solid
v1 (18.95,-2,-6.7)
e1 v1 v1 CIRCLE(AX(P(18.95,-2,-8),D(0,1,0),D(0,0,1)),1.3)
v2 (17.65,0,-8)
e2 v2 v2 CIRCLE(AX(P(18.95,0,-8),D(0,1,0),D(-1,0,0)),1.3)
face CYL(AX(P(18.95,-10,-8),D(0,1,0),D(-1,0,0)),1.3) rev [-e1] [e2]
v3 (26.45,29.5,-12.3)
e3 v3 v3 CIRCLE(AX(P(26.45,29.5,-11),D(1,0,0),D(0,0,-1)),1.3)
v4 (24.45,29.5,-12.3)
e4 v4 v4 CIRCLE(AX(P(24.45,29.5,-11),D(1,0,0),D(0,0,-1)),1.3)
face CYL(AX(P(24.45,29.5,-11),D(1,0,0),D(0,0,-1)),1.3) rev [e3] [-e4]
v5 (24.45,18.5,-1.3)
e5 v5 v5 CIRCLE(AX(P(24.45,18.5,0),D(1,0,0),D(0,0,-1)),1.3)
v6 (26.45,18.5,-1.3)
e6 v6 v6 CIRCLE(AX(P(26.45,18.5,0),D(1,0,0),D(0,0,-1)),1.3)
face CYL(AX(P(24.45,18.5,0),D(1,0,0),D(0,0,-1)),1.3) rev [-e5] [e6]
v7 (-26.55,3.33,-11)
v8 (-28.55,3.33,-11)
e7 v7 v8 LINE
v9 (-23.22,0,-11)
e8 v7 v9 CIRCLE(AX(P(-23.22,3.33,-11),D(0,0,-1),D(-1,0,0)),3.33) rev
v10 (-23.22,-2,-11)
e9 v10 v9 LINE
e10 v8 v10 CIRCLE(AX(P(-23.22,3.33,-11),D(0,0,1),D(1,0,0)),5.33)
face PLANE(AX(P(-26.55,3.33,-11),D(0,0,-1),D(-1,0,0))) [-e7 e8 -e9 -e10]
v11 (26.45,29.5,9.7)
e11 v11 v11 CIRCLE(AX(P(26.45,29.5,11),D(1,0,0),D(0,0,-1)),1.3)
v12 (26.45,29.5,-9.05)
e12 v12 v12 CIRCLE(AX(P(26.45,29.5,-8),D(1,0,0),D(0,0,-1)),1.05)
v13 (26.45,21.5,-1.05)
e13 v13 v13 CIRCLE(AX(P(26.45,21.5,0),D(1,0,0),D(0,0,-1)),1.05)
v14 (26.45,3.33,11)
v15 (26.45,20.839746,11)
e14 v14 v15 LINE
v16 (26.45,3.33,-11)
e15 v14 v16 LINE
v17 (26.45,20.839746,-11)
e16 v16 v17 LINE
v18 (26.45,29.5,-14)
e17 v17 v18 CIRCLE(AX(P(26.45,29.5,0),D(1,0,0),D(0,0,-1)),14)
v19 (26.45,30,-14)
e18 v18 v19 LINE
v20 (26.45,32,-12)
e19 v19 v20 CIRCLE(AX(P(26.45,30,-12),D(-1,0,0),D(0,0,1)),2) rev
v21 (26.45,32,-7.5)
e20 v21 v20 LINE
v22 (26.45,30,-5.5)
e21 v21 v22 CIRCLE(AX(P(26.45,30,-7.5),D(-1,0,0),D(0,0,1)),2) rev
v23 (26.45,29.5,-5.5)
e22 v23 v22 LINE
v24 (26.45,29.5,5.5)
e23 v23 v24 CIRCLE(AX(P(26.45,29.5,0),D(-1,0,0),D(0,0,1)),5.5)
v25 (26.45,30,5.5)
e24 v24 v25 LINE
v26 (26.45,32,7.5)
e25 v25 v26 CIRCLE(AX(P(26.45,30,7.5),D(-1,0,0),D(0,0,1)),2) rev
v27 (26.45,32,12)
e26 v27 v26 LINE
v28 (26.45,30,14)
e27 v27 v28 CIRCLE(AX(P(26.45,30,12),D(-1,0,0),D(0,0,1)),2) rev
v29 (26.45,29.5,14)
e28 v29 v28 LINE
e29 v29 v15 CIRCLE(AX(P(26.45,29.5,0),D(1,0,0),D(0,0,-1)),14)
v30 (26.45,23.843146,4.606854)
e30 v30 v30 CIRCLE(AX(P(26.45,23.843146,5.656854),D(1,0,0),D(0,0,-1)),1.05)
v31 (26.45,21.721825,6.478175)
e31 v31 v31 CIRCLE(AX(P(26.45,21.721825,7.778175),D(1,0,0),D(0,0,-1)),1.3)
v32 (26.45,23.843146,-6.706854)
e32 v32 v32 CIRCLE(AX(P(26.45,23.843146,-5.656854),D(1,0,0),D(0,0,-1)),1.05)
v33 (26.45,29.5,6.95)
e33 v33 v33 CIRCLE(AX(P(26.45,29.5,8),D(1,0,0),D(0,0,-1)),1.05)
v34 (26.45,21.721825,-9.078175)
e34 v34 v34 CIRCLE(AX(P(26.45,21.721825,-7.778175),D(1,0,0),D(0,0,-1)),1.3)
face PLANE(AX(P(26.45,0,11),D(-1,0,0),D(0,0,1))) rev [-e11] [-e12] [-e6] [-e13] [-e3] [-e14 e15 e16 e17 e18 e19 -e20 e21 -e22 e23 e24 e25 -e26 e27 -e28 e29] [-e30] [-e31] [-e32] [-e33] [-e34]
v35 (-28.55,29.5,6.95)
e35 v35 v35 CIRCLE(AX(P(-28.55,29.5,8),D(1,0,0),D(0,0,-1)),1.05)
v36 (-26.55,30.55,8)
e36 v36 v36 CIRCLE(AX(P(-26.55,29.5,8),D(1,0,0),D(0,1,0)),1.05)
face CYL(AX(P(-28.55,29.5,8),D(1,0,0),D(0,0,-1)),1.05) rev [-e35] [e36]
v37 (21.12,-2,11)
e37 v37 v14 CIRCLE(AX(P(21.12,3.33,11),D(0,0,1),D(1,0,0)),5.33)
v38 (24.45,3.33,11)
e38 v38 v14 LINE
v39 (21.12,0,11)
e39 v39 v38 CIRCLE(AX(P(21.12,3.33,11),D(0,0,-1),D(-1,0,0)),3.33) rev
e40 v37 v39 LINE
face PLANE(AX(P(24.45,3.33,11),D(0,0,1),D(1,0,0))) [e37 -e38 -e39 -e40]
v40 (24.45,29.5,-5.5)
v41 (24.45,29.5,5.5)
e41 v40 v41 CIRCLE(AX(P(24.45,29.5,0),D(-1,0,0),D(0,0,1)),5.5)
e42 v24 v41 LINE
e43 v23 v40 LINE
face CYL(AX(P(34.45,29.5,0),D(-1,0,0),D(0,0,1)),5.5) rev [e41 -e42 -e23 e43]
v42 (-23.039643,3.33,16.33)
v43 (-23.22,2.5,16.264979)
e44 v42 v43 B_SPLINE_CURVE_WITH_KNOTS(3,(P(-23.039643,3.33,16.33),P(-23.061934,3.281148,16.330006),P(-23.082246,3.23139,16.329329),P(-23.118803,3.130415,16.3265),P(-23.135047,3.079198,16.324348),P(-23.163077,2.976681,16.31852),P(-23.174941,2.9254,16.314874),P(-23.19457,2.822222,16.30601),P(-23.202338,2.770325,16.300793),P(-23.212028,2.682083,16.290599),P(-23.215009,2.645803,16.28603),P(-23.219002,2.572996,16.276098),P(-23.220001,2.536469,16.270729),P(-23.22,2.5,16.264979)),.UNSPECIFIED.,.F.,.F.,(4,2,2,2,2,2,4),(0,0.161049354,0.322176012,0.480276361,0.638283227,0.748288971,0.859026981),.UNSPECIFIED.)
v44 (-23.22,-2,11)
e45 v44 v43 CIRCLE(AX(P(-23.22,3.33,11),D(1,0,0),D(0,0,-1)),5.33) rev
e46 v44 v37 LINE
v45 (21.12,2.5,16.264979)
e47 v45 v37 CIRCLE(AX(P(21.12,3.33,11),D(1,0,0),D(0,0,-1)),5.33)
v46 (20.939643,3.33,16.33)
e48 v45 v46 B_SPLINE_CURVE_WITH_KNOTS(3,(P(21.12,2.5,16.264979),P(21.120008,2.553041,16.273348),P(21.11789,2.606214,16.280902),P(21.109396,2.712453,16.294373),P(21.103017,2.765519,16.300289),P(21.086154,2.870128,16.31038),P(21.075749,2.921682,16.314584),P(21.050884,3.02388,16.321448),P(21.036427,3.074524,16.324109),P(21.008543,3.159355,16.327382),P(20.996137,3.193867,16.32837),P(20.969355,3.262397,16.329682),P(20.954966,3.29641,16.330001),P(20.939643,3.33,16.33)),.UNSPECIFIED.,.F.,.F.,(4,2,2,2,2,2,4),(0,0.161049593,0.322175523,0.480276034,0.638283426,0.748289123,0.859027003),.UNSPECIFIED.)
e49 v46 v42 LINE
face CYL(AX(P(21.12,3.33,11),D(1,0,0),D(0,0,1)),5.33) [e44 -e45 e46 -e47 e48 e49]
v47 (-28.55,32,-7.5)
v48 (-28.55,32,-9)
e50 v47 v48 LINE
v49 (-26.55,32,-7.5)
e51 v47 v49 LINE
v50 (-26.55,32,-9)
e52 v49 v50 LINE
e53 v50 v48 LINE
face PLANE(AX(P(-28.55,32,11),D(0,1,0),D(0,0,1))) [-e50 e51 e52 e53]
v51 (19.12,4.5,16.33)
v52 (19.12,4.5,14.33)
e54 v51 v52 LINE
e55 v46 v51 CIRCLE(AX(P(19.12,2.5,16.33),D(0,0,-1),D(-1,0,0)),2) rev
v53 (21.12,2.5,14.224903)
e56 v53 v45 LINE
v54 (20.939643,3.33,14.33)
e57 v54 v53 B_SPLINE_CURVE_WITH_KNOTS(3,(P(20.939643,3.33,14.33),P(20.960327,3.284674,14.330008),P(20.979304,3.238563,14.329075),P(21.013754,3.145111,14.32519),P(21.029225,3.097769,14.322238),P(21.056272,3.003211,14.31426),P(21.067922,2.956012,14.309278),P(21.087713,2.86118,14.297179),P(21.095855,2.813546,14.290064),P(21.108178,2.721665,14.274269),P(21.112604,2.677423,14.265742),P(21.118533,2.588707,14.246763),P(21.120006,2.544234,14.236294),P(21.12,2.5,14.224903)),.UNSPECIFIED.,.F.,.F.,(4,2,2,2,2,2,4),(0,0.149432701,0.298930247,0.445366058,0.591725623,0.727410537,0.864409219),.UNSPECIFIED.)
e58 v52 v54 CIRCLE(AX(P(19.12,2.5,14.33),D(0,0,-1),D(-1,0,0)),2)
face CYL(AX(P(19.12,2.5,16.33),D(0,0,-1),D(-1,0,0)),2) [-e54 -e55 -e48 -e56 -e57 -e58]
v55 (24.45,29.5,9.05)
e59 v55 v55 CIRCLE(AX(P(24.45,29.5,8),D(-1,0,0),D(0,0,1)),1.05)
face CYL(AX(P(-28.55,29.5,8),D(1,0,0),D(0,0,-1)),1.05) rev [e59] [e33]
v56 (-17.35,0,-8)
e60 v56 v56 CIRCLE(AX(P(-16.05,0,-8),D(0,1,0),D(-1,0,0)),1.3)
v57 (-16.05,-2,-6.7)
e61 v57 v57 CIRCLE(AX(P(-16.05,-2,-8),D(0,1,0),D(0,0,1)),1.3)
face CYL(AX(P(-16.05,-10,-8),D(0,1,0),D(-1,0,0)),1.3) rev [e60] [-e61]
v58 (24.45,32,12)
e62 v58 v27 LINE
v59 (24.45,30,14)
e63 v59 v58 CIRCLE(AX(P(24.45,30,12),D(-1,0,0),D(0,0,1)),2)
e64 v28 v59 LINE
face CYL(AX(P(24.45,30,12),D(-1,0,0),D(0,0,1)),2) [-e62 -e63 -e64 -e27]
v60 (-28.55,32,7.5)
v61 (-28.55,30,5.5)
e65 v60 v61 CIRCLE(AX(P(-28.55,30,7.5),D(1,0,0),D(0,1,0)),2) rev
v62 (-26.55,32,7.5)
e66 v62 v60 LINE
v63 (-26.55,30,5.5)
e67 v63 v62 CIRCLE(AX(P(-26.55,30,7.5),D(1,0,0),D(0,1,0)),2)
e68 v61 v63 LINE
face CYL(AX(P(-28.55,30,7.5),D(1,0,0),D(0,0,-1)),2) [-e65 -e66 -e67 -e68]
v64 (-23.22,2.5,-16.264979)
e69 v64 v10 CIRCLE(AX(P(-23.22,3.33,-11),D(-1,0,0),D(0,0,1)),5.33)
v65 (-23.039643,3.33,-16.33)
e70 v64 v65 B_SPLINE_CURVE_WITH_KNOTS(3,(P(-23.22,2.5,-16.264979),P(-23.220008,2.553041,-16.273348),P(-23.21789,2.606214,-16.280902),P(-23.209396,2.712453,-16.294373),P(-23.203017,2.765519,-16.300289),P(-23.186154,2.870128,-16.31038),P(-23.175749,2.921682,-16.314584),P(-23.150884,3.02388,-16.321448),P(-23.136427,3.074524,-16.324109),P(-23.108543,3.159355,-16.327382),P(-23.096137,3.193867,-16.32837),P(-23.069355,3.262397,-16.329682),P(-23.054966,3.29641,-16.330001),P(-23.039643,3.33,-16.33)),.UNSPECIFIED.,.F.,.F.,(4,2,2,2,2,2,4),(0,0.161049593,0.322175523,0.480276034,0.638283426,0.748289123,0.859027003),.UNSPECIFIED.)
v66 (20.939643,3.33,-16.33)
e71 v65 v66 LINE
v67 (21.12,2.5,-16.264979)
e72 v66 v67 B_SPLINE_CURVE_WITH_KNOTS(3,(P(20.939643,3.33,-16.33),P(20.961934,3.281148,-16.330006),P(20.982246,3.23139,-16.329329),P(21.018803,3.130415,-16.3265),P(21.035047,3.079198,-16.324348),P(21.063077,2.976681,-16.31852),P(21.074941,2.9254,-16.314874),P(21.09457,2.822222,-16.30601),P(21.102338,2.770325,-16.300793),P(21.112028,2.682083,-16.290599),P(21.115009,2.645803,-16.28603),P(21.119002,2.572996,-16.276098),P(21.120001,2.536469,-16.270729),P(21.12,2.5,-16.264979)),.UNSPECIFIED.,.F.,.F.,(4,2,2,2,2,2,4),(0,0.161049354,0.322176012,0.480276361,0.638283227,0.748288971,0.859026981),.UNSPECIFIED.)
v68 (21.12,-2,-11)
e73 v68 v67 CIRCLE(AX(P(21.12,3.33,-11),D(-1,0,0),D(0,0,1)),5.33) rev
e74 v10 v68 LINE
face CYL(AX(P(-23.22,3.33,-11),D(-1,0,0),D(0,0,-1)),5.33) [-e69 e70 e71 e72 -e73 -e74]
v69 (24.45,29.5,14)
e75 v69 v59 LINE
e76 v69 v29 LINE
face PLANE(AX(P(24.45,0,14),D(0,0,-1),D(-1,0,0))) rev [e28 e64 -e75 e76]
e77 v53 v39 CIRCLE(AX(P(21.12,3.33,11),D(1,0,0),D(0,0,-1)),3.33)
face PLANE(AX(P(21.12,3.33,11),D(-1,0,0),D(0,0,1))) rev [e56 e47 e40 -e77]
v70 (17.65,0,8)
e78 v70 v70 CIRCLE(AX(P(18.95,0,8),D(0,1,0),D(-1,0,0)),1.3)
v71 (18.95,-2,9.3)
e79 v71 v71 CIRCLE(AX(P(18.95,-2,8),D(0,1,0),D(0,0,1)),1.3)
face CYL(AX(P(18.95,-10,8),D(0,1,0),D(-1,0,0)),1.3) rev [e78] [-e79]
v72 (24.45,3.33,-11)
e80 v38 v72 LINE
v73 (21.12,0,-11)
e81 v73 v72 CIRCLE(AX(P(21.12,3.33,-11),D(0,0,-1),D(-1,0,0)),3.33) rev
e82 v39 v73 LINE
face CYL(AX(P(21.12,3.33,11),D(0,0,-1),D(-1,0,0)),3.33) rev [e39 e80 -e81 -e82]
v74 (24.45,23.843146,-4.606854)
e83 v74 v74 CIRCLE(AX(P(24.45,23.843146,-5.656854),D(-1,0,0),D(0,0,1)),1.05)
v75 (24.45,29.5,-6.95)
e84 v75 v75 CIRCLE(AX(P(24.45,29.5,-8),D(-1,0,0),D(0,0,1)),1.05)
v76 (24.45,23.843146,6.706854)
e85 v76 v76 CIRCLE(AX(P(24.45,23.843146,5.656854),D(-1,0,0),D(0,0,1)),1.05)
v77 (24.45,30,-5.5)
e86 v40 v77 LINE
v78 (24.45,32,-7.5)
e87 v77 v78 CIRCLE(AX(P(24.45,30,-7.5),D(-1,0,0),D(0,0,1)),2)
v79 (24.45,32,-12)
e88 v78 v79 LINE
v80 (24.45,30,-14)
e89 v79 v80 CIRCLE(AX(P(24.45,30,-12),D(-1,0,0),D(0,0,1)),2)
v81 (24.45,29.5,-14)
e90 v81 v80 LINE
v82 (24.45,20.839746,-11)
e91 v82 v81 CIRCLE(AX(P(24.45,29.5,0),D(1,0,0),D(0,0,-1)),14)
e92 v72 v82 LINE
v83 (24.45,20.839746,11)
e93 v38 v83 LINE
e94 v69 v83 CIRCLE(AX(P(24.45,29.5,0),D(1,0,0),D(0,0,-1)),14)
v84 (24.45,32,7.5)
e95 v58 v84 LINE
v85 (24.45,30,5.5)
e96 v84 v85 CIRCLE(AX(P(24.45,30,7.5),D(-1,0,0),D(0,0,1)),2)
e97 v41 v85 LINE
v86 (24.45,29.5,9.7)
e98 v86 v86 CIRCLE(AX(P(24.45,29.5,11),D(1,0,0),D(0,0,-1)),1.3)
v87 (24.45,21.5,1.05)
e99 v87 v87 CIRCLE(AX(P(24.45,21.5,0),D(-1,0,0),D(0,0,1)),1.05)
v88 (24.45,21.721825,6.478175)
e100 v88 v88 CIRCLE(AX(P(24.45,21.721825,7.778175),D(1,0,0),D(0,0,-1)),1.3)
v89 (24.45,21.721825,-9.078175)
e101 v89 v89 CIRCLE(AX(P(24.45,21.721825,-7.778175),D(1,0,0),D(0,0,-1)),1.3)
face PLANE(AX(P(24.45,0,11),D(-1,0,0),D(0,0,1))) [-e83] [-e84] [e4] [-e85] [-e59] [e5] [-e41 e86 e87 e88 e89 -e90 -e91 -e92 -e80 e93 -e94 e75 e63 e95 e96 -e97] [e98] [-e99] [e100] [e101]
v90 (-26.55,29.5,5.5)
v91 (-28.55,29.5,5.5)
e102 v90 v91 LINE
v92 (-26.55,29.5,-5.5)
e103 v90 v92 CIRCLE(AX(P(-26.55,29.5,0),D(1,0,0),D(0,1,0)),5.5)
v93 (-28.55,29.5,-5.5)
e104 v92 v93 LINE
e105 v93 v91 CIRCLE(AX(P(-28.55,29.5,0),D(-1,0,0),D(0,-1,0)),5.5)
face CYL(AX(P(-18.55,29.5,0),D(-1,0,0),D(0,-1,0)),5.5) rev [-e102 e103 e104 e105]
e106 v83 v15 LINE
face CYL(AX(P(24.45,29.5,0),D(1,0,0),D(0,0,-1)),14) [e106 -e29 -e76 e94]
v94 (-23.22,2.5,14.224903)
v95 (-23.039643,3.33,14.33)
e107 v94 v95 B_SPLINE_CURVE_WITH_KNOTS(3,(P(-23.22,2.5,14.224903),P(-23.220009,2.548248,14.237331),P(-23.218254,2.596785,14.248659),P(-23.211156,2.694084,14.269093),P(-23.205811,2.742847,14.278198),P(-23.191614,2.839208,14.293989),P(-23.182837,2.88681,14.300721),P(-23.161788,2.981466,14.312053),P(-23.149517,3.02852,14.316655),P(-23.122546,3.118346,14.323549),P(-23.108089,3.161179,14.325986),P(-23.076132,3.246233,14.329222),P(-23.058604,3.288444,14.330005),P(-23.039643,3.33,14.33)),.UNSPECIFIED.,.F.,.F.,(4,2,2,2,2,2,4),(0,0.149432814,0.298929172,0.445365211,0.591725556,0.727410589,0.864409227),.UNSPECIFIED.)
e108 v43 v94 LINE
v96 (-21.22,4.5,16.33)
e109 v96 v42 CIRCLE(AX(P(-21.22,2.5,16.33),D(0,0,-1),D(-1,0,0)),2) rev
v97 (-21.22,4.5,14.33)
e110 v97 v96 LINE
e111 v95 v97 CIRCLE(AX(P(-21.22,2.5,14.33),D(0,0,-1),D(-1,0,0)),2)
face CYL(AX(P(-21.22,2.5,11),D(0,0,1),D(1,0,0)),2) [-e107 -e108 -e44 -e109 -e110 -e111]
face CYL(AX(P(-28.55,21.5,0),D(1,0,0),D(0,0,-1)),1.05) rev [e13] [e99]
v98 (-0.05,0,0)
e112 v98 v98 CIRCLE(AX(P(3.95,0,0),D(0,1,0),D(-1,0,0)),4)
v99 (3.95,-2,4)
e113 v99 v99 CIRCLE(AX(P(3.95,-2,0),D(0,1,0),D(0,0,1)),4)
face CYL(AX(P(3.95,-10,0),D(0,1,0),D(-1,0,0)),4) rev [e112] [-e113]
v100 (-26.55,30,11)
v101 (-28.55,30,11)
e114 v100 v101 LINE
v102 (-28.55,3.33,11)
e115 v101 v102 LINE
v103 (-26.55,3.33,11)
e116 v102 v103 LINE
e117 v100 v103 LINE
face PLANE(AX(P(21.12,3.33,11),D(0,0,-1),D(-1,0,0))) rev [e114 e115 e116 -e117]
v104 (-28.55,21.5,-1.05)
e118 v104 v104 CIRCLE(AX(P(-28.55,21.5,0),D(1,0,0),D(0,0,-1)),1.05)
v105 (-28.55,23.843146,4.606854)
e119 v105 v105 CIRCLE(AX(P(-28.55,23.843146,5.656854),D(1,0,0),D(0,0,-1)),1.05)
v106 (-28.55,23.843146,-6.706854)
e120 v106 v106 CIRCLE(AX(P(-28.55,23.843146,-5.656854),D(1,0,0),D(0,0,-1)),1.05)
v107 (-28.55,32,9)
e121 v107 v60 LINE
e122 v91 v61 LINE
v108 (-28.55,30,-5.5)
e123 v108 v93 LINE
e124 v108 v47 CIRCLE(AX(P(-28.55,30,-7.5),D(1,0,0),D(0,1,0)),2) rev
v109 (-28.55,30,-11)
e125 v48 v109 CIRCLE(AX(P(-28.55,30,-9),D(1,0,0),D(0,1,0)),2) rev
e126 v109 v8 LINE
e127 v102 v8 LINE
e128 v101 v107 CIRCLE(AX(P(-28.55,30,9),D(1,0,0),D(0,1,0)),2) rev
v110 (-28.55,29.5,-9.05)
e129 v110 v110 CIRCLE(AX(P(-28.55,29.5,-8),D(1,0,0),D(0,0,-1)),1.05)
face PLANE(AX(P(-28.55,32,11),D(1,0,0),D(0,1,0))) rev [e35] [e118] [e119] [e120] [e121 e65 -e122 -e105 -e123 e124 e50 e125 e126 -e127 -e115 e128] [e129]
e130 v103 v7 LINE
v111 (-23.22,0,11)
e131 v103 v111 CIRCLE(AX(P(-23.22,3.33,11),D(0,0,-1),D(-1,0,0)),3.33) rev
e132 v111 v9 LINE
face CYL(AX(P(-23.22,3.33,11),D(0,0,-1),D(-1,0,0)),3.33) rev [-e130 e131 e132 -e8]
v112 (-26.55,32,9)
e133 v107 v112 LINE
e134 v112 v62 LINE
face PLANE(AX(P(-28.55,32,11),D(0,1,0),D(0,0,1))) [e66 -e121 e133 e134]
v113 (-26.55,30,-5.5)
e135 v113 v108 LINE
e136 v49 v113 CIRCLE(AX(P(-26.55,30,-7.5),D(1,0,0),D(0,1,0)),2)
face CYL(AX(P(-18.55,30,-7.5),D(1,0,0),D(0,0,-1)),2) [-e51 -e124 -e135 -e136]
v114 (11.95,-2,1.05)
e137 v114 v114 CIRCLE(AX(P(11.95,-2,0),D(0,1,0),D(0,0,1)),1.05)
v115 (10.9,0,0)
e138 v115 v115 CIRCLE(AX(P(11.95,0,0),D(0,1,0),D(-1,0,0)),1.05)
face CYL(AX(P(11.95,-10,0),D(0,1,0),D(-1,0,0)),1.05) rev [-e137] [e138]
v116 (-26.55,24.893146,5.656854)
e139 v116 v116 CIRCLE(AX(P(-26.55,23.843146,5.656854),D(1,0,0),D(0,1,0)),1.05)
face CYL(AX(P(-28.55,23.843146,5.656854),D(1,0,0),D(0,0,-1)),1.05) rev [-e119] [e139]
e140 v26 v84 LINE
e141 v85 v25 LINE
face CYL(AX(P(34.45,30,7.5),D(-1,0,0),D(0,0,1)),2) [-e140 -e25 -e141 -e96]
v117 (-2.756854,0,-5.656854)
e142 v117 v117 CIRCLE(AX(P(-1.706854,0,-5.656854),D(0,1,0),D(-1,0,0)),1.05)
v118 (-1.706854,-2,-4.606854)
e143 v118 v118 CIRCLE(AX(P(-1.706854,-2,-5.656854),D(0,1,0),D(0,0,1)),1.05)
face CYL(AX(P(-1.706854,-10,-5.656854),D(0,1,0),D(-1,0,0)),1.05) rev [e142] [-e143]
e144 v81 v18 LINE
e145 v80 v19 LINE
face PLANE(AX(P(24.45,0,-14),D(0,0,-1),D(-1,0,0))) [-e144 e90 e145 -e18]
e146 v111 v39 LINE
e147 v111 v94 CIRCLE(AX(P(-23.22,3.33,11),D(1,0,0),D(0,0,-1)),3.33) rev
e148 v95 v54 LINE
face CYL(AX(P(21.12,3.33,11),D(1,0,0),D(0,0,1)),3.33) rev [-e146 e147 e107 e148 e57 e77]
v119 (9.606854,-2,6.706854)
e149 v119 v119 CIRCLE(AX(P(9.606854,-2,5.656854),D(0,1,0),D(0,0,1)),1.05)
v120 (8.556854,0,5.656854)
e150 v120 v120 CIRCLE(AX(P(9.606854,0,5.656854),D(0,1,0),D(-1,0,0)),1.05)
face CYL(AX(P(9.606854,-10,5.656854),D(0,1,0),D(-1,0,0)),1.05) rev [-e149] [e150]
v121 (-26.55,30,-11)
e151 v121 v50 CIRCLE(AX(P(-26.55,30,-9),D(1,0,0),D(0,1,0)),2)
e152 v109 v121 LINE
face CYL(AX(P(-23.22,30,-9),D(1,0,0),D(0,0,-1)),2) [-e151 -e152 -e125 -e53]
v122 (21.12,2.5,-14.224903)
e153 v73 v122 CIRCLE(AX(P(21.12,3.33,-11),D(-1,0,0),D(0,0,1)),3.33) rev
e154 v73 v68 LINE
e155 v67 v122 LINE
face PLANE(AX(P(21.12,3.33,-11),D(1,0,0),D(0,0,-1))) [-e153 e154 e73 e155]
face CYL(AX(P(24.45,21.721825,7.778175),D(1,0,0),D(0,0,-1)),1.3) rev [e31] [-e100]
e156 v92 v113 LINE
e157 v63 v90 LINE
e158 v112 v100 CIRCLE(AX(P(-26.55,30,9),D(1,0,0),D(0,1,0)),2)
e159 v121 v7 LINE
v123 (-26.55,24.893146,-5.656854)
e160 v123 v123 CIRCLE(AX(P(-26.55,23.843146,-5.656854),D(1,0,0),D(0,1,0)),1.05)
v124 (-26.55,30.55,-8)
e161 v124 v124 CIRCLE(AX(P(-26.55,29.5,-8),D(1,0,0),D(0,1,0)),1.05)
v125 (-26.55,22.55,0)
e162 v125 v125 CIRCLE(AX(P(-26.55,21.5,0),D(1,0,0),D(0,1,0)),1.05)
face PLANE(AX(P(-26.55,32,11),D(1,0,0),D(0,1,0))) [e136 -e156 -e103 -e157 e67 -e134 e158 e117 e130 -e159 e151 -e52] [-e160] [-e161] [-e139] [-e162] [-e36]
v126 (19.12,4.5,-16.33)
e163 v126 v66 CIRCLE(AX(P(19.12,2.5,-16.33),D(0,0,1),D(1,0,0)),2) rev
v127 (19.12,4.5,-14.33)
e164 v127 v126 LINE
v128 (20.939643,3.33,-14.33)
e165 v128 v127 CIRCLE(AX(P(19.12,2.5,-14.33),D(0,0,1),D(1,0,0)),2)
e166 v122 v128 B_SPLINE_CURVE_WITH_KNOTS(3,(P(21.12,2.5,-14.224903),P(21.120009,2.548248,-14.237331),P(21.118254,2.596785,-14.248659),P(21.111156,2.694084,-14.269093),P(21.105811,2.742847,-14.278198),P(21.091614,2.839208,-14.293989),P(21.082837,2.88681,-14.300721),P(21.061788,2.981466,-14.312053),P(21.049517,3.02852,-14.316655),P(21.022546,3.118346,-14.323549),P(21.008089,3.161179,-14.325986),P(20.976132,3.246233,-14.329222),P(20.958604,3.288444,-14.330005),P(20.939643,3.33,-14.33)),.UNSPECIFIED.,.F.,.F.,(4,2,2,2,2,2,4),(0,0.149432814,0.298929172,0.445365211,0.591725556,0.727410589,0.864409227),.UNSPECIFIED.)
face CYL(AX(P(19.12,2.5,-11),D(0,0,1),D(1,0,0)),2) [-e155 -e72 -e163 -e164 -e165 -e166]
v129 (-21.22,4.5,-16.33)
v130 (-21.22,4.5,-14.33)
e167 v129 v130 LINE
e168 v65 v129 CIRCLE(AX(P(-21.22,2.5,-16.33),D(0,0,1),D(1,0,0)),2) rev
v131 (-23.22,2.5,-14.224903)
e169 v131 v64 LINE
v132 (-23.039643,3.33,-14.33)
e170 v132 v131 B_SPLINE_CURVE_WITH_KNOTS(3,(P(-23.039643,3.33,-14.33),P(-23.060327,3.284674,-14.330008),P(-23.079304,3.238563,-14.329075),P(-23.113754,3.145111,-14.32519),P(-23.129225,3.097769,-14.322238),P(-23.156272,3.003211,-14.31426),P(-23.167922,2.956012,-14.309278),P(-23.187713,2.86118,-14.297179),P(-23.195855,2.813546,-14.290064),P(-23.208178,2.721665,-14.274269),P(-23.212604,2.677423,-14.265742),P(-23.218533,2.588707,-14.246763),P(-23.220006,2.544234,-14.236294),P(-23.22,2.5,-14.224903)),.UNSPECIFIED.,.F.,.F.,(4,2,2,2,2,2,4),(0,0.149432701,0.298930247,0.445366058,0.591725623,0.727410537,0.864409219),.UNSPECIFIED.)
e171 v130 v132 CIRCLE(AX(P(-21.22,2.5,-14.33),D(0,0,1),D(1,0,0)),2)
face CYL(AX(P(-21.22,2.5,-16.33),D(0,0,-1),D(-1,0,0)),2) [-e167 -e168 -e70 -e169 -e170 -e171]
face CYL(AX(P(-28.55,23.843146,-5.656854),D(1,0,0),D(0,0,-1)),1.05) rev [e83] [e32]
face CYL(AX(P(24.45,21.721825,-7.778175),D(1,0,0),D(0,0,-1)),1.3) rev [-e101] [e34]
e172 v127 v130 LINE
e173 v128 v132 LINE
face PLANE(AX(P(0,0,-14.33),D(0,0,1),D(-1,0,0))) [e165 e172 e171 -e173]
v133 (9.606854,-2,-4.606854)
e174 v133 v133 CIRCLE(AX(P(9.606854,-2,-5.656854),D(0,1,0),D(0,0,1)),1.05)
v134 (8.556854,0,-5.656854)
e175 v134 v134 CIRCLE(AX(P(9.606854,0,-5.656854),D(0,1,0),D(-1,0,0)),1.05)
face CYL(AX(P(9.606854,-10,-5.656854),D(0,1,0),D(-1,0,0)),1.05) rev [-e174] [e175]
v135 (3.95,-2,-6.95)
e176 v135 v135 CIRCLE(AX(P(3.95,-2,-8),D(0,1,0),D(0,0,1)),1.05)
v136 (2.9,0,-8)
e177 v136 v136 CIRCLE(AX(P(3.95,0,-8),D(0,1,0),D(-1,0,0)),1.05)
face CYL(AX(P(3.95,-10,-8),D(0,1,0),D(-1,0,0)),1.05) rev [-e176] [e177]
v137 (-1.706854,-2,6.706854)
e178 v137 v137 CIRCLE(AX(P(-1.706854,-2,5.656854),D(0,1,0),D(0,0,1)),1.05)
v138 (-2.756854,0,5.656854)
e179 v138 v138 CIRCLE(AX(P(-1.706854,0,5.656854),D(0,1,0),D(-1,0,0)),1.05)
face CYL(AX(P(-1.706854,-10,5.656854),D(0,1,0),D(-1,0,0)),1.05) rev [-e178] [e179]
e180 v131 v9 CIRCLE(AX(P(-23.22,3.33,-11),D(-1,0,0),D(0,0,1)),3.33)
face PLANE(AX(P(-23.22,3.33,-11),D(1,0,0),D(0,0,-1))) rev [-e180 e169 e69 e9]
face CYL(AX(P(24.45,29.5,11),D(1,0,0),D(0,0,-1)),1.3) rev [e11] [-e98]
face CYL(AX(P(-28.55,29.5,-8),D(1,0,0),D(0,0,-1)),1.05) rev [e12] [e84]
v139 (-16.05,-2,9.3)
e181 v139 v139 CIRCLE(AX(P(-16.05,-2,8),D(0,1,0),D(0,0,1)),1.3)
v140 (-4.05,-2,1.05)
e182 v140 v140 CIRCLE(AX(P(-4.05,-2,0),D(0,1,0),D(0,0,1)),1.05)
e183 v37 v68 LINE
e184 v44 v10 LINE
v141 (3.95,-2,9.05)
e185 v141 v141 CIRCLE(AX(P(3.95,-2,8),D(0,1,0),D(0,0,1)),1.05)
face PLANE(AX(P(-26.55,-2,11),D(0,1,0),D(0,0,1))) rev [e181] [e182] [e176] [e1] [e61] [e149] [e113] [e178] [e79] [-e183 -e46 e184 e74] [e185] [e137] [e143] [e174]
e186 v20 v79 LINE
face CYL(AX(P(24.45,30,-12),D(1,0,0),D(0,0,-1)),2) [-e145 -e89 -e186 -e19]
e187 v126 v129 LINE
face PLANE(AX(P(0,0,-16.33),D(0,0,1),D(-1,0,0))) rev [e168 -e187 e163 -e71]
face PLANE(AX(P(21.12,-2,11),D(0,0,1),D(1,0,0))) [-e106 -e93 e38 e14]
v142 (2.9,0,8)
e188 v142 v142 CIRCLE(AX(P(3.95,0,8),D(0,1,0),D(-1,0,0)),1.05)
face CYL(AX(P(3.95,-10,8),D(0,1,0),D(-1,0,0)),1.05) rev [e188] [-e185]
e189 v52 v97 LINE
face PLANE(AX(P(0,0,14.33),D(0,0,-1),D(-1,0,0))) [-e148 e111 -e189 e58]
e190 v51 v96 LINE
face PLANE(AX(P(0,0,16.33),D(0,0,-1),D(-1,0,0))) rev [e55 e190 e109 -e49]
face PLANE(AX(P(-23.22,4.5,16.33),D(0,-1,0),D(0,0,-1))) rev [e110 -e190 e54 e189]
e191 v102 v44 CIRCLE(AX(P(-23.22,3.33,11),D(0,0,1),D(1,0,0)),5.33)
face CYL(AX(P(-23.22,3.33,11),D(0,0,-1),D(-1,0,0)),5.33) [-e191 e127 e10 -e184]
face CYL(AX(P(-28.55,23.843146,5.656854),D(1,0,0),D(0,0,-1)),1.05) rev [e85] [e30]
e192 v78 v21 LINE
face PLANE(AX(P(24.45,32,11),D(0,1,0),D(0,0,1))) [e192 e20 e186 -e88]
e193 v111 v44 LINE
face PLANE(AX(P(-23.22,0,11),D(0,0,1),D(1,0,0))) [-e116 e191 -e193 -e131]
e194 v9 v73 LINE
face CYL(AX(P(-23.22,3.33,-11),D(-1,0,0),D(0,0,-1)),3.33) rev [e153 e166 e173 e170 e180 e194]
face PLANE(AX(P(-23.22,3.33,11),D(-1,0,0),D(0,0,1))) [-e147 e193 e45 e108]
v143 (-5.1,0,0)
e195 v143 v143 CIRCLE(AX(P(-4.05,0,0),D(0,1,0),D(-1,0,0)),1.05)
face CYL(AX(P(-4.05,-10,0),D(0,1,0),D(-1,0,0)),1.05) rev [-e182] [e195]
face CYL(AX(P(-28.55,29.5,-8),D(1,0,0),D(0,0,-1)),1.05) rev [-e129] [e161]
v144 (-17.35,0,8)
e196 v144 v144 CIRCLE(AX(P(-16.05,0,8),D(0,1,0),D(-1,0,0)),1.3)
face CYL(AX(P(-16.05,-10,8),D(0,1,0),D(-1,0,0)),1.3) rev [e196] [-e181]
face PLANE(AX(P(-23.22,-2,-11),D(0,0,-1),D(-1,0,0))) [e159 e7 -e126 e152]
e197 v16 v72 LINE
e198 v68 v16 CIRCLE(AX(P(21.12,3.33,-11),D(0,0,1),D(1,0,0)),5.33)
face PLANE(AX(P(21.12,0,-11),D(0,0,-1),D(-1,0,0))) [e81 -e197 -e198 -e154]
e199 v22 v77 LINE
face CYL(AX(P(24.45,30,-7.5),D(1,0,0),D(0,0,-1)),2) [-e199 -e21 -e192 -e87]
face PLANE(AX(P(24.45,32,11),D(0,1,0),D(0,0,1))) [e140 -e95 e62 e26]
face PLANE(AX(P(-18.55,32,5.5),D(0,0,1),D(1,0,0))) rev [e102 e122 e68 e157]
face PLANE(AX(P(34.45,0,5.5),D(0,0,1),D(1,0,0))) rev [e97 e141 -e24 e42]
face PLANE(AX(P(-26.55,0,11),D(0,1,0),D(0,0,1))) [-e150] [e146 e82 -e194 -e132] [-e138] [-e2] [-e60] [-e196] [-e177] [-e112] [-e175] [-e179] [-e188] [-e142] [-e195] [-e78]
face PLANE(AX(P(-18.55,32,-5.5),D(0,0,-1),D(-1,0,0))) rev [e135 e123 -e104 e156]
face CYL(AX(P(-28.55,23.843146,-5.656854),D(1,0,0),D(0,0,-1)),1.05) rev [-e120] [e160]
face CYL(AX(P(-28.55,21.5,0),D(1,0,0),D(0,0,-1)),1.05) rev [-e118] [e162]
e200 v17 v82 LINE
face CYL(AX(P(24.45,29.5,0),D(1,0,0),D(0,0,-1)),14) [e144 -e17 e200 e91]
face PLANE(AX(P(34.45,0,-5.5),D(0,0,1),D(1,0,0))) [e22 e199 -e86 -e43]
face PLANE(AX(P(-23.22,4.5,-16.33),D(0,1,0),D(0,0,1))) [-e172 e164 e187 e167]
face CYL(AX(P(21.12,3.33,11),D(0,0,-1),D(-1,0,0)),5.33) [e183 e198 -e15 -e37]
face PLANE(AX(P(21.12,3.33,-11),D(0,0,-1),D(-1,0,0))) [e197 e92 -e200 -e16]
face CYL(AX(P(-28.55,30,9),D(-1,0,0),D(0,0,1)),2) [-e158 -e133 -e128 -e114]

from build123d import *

# Parameters (mm, degrees)
BASE_FLANGE1_DEPTH      = 11
SKETCH5_R               = 4
SKETCH5_R_2             = 1.3
SKETCH5_R_3             = 1.05
CUT_EXTRUDE1_DEPTH      = 10
CUT_EXTRUDE2_DEPTH      = 45.273044847
CUT_EXTRUDE2_DEPTH_BACK = 45.273044847
SKETCH6_R               = 1.05
CUT_EXTRUDE3_DEPTH      = 10
FILLET1_R               = 2
EDGE_FLANGE1_DEPTH      = 44.34
FILLET2_R               = 2
FILLET2_OF_MIRROR1_R    = 2
BOSS_EXTRUDE2_DEPTH     = 2
FILLET4_R               = 2
SKETCH15_R              = 1.3
CUT_EXTRUDE5_DEPTH      = 2
CUT_EXTRUDE6_DEPTH      = 10
FILLET5_R               = 2


# Sheet-metal steps are written as plain solids
with BuildPart() as part:
    # Sketch1 → Base-Flange1 (new, symmetric)
    with BuildSketch(Plane.XY):
        with BuildLine():
            Line((-26.55, 32), (-26.55, 3.33))
            ThreePointArc((-26.55, 3.33), (-25.574665581, 0.975334419), (-23.22, 0))
            Line((-23.22, 0), (21.12, 0))
            ThreePointArc((21.12, 0), (23.474665581, 0.975334419), (24.45, 3.33))
            Line((24.45, 3.33), (24.45, 32))
            Line((24.45, 32), (26.45, 32))
            Line((26.45, 32), (26.45, 3.33))
            ThreePointArc((26.45, 3.33), (24.888879144, -0.438879144), (21.12, -2))
            Line((21.12, -2), (-23.22, -2))
            ThreePointArc((-23.22, -2), (-26.988879144, -0.438879144), (-28.55, 3.33))
            Line((-28.55, 3.33), (-28.55, 32))
            Line((-28.55, 32), (-26.55, 32))
        make_face()
    extrude(amount=BASE_FLANGE1_DEPTH, both=True)

    # Sketch5 → Cut-Extrude1 (cut)
    with BuildSketch(Plane(origin=(0, 0, 0), x_dir=(1, 0, 0), z_dir=(0, 1, 0))):
        with Locations(Location((3.95, 0, 0), (0, 0, 180))):
            Circle(SKETCH5_R)
        with Locations(Location((18.95, 8, 0), (0, 0, 180))):
            Circle(SKETCH5_R_2)
        with Locations(Location((18.95, -8, 0), (0, 0, 180))):
            Circle(SKETCH5_R_2)
        with Locations(Location((-16.05, -8, 0), (0, 0, 180))):
            Circle(SKETCH5_R_2)
        with Locations(Location((-16.05, 8, 0), (0, 0, 180))):
            Circle(SKETCH5_R_2)
        with Locations(Location((-4.05, 0, 0), (0, 0, 180))):
            Circle(SKETCH5_R_3)
        with Locations(Location((-1.706854249, 5.656854249, 0), (0, 0, 180))):
            Circle(SKETCH5_R_3)
        with Locations(Location((3.95, 8, 0), (0, 0, 180))):
            Circle(SKETCH5_R_3)
        with Locations(Location((9.606854249, 5.656854249, 0), (0, 0, 180))):
            Circle(SKETCH5_R_3)
        with Locations(Location((11.95, 0, 0), (0, 0, 180))):
            Circle(SKETCH5_R_3)
        with Locations(Location((9.606854249, -5.656854249, 0), (0, 0, 180))):
            Circle(SKETCH5_R_3)
        with Locations(Location((3.95, -8, 0), (0, 0, 180))):
            Circle(SKETCH5_R_3)
        with Locations(Location((-1.706854249, -5.656854249, 0), (0, 0, 180))):
            Circle(SKETCH5_R_3)
    extrude(amount=-CUT_EXTRUDE1_DEPTH, mode=Mode.SUBTRACT)

    # Sketch6 → Cut-Extrude2 (cut, two sides: drawn at the far end of the back side and taken through both)
    with BuildSketch(Plane(origin=(0, 0, 0), x_dir=(0, 0, -1), z_dir=(1, 0, 0)).offset(-CUT_EXTRUDE2_DEPTH_BACK)):
        with Locations((0, 21.5)):
            Circle(SKETCH6_R)
        with Locations((-5.656854249, 23.843145751)):
            Circle(SKETCH6_R)
        with Locations((-8, 29.5)):
            Circle(SKETCH6_R)
        with Locations((-5.656854249, 35.156854249)):
            Circle(SKETCH6_R)
        with Locations((0, 37.5)):
            Circle(SKETCH6_R)
        with Locations((5.656854249, 35.156854249)):
            Circle(SKETCH6_R)
        with Locations((8, 29.5)):
            Circle(SKETCH6_R)
        with Locations((5.656854249, 23.843145751)):
            Circle(SKETCH6_R)
        with BuildLine():
            Line((4.05, 32), (-4.05, 32))
            Line((-4.05, 32), (-4.05, 29.5))
            ThreePointArc((-4.05, 29.5), (0, 25.45), (4.05, 29.5))
            Line((4.05, 29.5), (4.05, 32))
        make_face()
    extrude(amount=CUT_EXTRUDE2_DEPTH + CUT_EXTRUDE2_DEPTH_BACK, mode=Mode.SUBTRACT)

    # Sketch7 → Cut-Extrude3 (cut)
    with BuildSketch(Plane.ZY.offset(28.55)):
        with BuildLine():
            Line((-5.5, 32), (5.5, 32))
            Line((5.5, 32), (5.5, 29.5))
            ThreePointArc((5.5, 29.5), (0, 24), (-5.5, 29.5))
            Line((-5.5, 29.5), (-5.5, 32))
        make_face()
    extrude(amount=-CUT_EXTRUDE3_DEPTH, mode=Mode.SUBTRACT)

    # Fillet1
    fillet1_edges = [part.edges().sort_by_distance(p)[0] for p in [
        (-27.55, 32, -11),
        (25.45, 32, -11),
        (-27.55, 32, -5.5),
        (-27.55, 32, 5.5),
        (-27.55, 32, 11),
        (25.45, 32, 11),
    ]]
    fillet(fillet1_edges, radius=FILLET1_R)

    # Edge-Flange1 section (across the edge) → Edge-Flange1 (add)
    with BuildSketch(Plane(origin=(-23.22, 0, 14.33), x_dir=(0, 0, -1), z_dir=(1, 0, 0))):
        with BuildLine():
            Line((-2, 3.33), (-2, 4.5))
            Line((-2, 4.5), (0, 4.5))
            Line((0, 4.5), (0, 3.33))
            ThreePointArc((0, 3.33), (0.975334419, 0.975334419), (3.33, 0))
            Line((3.33, 0), (3.33, -2))
            ThreePointArc((3.33, -2), (-0.438879144, -0.438879144), (-2, 3.33))
        make_face()
    edge_flange1 = extrude(amount=EDGE_FLANGE1_DEPTH)

    # Fillet2
    fillet2_edges = [part.edges().sort_by_distance(p)[0] for p in [
        (-23.22, 4.5, 15.33),
        (21.12, 4.5, 15.33),
    ]]
    fillet(fillet2_edges, radius=FILLET2_R)

    # Mirror1: Edge-Flange1 across plane
    add(edge_flange1.mirror(Plane.XY))

    # Fillet2 of Mirror1
    fillet2_of_mirror1_edges = [part.edges().sort_by_distance(p)[0] for p in [
        (-23.22, 4.5, -15.33),
        (21.12, 4.5, -15.33),
    ]]
    fillet(fillet2_of_mirror1_edges, radius=FILLET2_OF_MIRROR1_R)

    # Sketch14 → Boss-Extrude2 (add)
    with BuildSketch(Plane(origin=(26.45, 0, 0), x_dir=(0, 0, -1), z_dir=(1, 0, 0))):
        with BuildLine():
            Line((-11, 29.5), (-14, 29.5))
            ThreePointArc((-14, 29.5), (-13.228756555, 24.917424305), (-11, 20.839745962))
            Line((-11, 20.839745962), (-11, 29.5))
        make_face()
        with BuildLine():
            Line((-9.25, 29.5), (-11, 29.5))
            Line((-11, 29.5), (-11, 20.839745962))
            ThreePointArc((-11, 20.839745962), (0, 15.5), (11, 20.839745962))
            Line((11, 20.839745962), (11, 29.5))
            Line((11, 29.5), (9.25, 29.5))
            ThreePointArc((9.25, 29.5), (0, 20.25), (-9.25, 29.5))
        make_face()
        with BuildLine():
            Line((-14, 32), (-14, 29.5))
            Line((-14, 29.5), (-11, 29.5))
            Line((-11, 29.5), (-11, 30))
            ThreePointArc((-11, 30), (-10.414213562, 31.414213562), (-9, 32))
            Line((-9, 32), (-14, 32))
        make_face()
        with BuildLine():
            Line((-11, 30), (-11, 29.5))
            Line((-11, 29.5), (-9.25, 29.5))
            ThreePointArc((-9.25, 29.5), (-9.163535023, 30.761794708), (-8.905756565, 32))
            Line((-8.905756565, 32), (-9, 32))
            ThreePointArc((-9, 32), (-10.414213562, 31.414213562), (-11, 30))
        make_face()
        with BuildLine():
            Line((11, 29.5), (14, 29.5))
            Line((14, 29.5), (14, 32))
            Line((14, 32), (9, 32))
            ThreePointArc((9, 32), (10.414213562, 31.414213562), (11, 30))
            Line((11, 30), (11, 29.5))
        make_face()
        with BuildLine():
            Line((11, 29.5), (11, 20.839745962))
            ThreePointArc((11, 20.839745962), (13.228756555, 24.917424305), (14, 29.5))
            Line((14, 29.5), (11, 29.5))
        make_face()
        with BuildLine():
            ThreePointArc((8.905756565, 32), (9.163535023, 30.761794708), (9.25, 29.5))
            Line((9.25, 29.5), (11, 29.5))
            Line((11, 29.5), (11, 30))
            ThreePointArc((11, 30), (10.414213562, 31.414213562), (9, 32))
            Line((9, 32), (8.905756565, 32))
        make_face()
    extrude(amount=-BOSS_EXTRUDE2_DEPTH)

    # Fillet4
    fillet4_edges = [part.edges().sort_by_distance(p)[0] for p in [
        (25.45, 32, 14),
        (25.45, 32, -14),
    ]]
    fillet(fillet4_edges, radius=FILLET4_R)

    # Sketch15 → Cut-Extrude5 (cut)
    with BuildSketch(Plane(origin=(26.45, 0, 0), x_dir=(0, 0, -1), z_dir=(1, 0, 0))):
        with Locations((0, 18.5)):
            Circle(SKETCH15_R)
        with Locations((-7.778174593, 21.721825407)):
            Circle(SKETCH15_R)
        with Locations((-11, 29.5)):
            Circle(SKETCH15_R)
        with Locations((-7.778174593, 37.278174593)):
            Circle(SKETCH15_R)
        with Locations((0, 40.5)):
            Circle(SKETCH15_R)
        with Locations((7.778174593, 37.278174593)):
            Circle(SKETCH15_R)
        with Locations((11, 29.5)):
            Circle(SKETCH15_R)
        with Locations((7.778174593, 21.721825407)):
            Circle(SKETCH15_R)
    extrude(amount=-CUT_EXTRUDE5_DEPTH, mode=Mode.SUBTRACT)

    # Sketch16 → Cut-Extrude6 (cut)
    with BuildSketch(Plane.ZY.offset(-24.45)):
        with BuildLine():
            Line((-4.05, 29.5), (-5.5, 29.5))
            ThreePointArc((-5.5, 29.5), (0, 24), (5.5, 29.5))
            Line((5.5, 29.5), (4.05, 29.5))
            ThreePointArc((4.05, 29.5), (0, 25.45), (-4.05, 29.5))
        make_face()
        with BuildLine():
            Line((-4.05, 32), (-4.05, 29.5))
            Line((-4.05, 29.5), (4.05, 29.5))
            Line((4.05, 29.5), (4.05, 32))
            Line((4.05, 32), (4.898979486, 32))
            ThreePointArc((4.898979486, 32), (0, 35), (-4.898979486, 32))
            Line((-4.898979486, 32), (-4.05, 32))
        make_face()
        with BuildLine():
            ThreePointArc((-4.898979486, 32), (-5.347634392, 30.785615189), (-5.5, 29.5))
            Line((-5.5, 29.5), (-4.05, 29.5))
            Line((-4.05, 29.5), (-4.05, 32))
            Line((-4.05, 32), (-4.898979486, 32))
        make_face()
        with BuildLine():
            Line((-5.5, 32), (-5.5, 29.5))
            ThreePointArc((-5.5, 29.5), (-5.347634392, 30.785615189), (-4.898979486, 32))
            Line((-4.898979486, 32), (-5.5, 32))
        make_face()
        with BuildLine():
            Line((-5.5, 36.162581974), (-5.5, 32))
            Line((-5.5, 32), (-4.898979486, 32))
            ThreePointArc((-4.898979486, 32), (0, 35), (4.898979486, 32))
            Line((4.898979486, 32), (5.5, 32))
            Line((5.5, 32), (5.5, 36.162581974))
            Line((5.5, 36.162581974), (-5.5, 36.162581974))
        make_face()
        with BuildLine():
            Line((4.05, 29.5), (5.5, 29.5))
            ThreePointArc((5.5, 29.5), (5.347634392, 30.785615189), (4.898979486, 32))
            Line((4.898979486, 32), (4.05, 32))
            Line((4.05, 32), (4.05, 29.5))
        make_face()
        with BuildLine():
            ThreePointArc((4.898979486, 32), (5.347634392, 30.785615189), (5.5, 29.5))
            Line((5.5, 29.5), (5.5, 32))
            Line((5.5, 32), (4.898979486, 32))
        make_face()
    extrude(amount=-CUT_EXTRUDE6_DEPTH, mode=Mode.SUBTRACT)

    # Fillet5
    fillet5_edges = [part.edges().sort_by_distance(p)[0] for p in [
        (25.45, 32, 5.5),
        (25.45, 32, -5.5),
    ]]
    fillet(fillet5_edges, radius=FILLET5_R)


solid = part.part
